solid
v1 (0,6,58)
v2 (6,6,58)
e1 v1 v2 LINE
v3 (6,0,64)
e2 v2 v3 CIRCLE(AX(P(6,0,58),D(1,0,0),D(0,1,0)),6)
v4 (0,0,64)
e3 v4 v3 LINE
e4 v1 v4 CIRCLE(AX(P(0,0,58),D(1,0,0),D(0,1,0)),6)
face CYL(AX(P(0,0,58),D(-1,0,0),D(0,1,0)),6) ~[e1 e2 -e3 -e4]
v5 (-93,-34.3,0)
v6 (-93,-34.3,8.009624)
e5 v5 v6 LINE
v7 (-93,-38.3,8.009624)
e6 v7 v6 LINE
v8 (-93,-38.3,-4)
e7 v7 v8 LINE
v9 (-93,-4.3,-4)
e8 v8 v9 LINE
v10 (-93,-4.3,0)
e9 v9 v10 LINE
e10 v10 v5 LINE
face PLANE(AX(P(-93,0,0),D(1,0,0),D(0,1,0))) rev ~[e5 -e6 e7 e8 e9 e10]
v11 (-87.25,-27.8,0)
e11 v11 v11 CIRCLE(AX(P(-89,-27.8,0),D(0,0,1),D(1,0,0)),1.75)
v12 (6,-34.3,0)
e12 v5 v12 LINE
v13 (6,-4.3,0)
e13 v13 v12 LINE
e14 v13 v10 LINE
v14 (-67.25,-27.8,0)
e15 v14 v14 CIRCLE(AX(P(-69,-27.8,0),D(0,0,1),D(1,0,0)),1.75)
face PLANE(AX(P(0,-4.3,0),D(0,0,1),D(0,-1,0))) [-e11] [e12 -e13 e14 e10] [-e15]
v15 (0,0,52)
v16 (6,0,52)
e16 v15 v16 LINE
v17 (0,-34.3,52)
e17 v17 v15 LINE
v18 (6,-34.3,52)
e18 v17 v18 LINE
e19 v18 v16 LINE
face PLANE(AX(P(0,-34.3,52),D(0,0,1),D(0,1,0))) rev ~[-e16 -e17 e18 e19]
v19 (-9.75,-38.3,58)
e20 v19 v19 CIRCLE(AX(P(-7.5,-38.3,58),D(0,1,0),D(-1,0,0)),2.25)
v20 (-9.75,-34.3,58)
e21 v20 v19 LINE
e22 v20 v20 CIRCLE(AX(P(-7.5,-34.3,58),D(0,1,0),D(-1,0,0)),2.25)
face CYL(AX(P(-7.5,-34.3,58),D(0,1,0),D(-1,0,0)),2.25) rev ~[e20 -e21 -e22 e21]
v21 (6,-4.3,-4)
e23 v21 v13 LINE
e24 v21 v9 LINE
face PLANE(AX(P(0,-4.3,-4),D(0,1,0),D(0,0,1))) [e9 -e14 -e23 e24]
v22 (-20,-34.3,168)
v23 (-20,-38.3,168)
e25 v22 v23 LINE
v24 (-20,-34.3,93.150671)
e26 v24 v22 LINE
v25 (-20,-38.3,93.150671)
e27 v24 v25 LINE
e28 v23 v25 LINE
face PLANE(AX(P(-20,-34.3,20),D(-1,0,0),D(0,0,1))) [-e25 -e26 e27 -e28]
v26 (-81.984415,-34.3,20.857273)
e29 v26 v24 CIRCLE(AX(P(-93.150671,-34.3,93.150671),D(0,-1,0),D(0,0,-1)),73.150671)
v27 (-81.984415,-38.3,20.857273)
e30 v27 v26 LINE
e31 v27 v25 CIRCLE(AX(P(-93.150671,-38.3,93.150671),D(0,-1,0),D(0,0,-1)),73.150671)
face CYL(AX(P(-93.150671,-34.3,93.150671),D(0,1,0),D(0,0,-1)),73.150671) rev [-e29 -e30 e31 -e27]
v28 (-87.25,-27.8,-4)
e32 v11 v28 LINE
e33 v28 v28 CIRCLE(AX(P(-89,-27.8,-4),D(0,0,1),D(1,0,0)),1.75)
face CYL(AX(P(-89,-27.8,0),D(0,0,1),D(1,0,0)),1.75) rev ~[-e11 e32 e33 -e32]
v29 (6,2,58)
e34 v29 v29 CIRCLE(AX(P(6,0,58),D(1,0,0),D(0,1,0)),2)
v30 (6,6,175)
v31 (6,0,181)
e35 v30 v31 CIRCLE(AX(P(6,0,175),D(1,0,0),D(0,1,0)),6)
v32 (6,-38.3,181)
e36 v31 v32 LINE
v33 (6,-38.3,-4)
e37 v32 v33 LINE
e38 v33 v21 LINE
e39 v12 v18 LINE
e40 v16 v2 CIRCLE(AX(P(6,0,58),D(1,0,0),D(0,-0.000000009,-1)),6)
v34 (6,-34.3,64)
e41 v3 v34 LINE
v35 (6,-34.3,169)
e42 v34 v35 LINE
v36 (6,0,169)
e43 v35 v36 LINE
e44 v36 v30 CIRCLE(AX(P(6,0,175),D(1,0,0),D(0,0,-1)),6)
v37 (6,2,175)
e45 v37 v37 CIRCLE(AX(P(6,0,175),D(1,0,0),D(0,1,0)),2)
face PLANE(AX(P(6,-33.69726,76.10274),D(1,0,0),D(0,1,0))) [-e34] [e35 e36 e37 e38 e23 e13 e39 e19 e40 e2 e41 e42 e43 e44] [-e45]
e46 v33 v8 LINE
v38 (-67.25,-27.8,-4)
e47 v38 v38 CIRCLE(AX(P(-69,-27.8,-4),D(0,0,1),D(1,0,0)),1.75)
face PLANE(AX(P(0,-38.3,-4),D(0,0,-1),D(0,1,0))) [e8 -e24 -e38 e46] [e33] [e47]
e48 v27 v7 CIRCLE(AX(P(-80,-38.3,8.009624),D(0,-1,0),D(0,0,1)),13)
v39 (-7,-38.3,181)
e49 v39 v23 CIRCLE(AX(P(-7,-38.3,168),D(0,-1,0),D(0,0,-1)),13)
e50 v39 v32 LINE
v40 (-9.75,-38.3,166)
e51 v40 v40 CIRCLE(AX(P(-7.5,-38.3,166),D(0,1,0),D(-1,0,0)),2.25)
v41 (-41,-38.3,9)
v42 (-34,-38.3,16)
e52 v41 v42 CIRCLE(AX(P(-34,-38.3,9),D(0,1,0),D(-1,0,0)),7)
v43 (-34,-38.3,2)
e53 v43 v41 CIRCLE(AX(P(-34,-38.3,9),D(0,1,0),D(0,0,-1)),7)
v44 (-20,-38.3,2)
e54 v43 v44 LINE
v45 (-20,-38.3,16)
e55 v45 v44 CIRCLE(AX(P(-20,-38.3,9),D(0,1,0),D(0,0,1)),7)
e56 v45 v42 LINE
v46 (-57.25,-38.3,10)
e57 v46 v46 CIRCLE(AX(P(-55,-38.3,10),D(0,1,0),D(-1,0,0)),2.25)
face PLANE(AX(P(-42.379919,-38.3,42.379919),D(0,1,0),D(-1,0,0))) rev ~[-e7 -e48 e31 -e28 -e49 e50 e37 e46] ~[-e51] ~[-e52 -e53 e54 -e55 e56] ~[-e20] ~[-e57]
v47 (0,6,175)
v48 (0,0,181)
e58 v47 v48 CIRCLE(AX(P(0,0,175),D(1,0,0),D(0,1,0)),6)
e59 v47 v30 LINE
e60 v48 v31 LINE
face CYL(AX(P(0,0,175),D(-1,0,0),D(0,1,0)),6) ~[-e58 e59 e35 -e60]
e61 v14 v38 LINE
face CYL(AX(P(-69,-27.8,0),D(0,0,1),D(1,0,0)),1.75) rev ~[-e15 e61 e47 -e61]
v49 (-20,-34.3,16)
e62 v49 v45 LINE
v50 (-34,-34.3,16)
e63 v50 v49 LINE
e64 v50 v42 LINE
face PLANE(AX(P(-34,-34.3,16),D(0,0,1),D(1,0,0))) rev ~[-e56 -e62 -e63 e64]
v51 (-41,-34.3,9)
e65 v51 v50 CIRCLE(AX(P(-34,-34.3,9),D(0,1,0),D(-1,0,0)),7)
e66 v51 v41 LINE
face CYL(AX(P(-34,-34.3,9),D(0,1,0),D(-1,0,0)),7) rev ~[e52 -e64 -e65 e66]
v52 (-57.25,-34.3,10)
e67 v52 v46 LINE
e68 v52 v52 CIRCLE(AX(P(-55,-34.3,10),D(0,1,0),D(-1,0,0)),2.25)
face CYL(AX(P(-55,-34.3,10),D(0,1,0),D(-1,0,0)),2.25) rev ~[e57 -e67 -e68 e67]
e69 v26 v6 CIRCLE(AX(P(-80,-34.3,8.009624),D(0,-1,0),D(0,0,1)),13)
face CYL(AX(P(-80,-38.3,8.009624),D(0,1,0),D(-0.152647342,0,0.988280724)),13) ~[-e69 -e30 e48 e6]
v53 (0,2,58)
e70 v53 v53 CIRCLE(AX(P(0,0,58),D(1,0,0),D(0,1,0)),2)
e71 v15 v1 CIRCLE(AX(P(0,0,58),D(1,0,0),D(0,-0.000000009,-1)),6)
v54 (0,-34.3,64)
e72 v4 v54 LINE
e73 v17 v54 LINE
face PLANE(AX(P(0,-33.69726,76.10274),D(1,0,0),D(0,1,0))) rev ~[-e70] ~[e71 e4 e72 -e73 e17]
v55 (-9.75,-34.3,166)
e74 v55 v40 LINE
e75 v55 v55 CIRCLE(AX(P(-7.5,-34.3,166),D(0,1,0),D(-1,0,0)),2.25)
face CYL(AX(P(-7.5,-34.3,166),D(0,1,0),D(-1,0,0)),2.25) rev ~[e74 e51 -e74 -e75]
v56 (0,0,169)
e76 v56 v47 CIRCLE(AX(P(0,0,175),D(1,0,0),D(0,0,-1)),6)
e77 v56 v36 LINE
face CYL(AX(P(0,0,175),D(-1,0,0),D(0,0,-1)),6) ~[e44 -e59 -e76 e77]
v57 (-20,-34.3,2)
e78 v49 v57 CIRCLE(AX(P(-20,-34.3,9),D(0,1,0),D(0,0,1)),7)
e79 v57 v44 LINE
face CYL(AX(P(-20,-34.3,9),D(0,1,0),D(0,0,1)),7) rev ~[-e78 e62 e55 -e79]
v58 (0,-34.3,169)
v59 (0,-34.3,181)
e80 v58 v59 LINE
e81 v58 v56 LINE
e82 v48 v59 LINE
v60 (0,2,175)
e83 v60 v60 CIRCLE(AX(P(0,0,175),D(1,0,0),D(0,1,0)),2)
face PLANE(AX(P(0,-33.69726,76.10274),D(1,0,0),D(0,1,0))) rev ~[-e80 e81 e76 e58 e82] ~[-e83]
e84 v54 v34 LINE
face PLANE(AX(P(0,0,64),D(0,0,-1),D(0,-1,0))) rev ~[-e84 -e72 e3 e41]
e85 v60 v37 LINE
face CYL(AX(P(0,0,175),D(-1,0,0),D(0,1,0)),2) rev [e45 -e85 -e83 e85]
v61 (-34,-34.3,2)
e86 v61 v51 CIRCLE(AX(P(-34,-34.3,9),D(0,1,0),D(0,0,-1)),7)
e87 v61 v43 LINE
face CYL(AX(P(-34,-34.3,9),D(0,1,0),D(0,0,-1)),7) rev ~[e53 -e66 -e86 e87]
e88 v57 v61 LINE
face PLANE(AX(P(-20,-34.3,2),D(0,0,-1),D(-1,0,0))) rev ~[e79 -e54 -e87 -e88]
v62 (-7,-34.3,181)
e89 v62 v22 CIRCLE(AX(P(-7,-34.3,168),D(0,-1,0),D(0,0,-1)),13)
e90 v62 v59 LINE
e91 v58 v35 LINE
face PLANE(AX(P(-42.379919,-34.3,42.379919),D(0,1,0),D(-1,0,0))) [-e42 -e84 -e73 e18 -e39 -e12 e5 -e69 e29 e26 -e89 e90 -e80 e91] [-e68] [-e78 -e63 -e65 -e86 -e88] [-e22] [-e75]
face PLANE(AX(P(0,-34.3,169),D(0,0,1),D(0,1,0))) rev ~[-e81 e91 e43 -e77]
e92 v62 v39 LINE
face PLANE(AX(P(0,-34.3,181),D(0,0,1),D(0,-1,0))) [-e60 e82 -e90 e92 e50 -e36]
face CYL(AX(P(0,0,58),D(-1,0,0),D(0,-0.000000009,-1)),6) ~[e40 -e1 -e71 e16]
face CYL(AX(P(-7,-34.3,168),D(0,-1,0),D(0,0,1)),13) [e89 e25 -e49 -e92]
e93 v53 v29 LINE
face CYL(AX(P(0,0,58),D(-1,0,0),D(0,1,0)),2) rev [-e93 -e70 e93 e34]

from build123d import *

# Parameters (mm, degrees)
F0_R        = 2
F1_DEPTH    = 6
F2_DEPTH    = 93
F4_DEPTH    = 25
F3_R        = 1.75
F5_DEPTH    = 4.001
F6_W        = 73
F6_H        = 161
F6_R        = 2.25
F7_DEPTH    = 4.001
F8_T4_DEPTH = 4
F9_R        = 13


# Not quite as in the source:
# - a fillet or chamfer that OpenCascade refuses, or shapes differently, is made with other operations: its cross-section is extruded or revolved along the edge and cut away or added


with BuildPart() as f1:
    # F0 (on Right) → F1 (new body)
    with BuildSketch(Plane.YZ):
        Polygon((-4.3, 0), (-34.3, 0), (-34.3, 52), (-34.3, 64), (-34.3, 169), (-34.3, 181), (-38.3, 181), (-38.3, -4), (-4.3, -4), align=None)
        with BuildLine():
            Line((-34.3, 181), (-34.3, 169))
            Line((-34.3, 169), (0, 169))
            ThreePointArc((0, 169), (-6, 174.9999999833), (-3.34e-08, 181))
            Line((-3.34e-08, 181), (-34.3, 181))
        make_face()
        with BuildLine():
            Line((-34.3, 64), (-34.3, 52))
            Line((-34.3, 52), (-5.41e-08, 52))
            ThreePointArc((-5.41e-08, 52), (-6, 58.0000000477), (4.13e-08, 64))
            Line((4.13e-08, 64), (-34.3, 64))
        make_face()
        with BuildLine():
            ThreePointArc((-3.34e-08, 181), (-6, 174.9999999833), (0, 169))
            ThreePointArc((0, 169), (4.2426406871, 170.7573593129), (6, 175))
            ThreePointArc((6, 175), (4.2426406753, 179.2426406989), (-3.34e-08, 181))
        make_face()
        with Locations((0, 175)):
            Circle(F0_R, mode=Mode.SUBTRACT)
        with BuildLine():
            ThreePointArc((4.13e-08, 64), (-6, 58.0000000477), (-5.41e-08, 52))
            ThreePointArc((-5.41e-08, 52), (4.242640668, 53.7573592937), (6, 58))
            ThreePointArc((6, 58), (4.2426407017, 62.2426406725), (4.13e-08, 64))
        make_face()
        with Locations((0, 58)):
            Circle(F0_R, mode=Mode.SUBTRACT)
    extrude(amount=F1_DEPTH)

    # F0 (on Right) → F2 (join)
    with BuildSketch(Plane.YZ):
        Polygon((-4.3, 0), (-34.3, 0), (-34.3, 52), (-34.3, 64), (-34.3, 169), (-34.3, 181), (-38.3, 181), (-38.3, -4), (-4.3, -4), align=None)
    extrude(amount=-F2_DEPTH)

    # F0 (on Right) → F4 (join)
    with BuildSketch(Plane.YZ):
        Polygon((-4.3, 0), (-34.3, 0), (-34.3, 52), (-34.3, 64), (-34.3, 169), (-34.3, 181), (-38.3, 181), (-38.3, -4), (-4.3, -4), align=None)
    extrude(amount=-F4_DEPTH)

    # F3 (on face) → F5 (cut, through all)
    with BuildSketch(Plane.XY):
        with Locations((-89, -27.8)):
            Circle(F3_R)
        with Locations((-69, -27.8)):
            Circle(F3_R)
    extrude(amount=-F5_DEPTH, mode=Mode.SUBTRACT)

    # F6 (on face) → F7 (cut, through all)
    with BuildSketch(Plane(origin=(0, -34.3, 0), x_dir=(-1, 0, 0), z_dir=(0, 1, 0))):
        with Locations((56.5, 100.5)):
            Rectangle(F6_W, F6_H)
        with BuildLine():
            ThreePointArc((20, 2), (24.9497474683, 4.0502525317), (27, 9))
            ThreePointArc((27, 9), (24.9497474683, 13.9497474683), (20, 16))
            ThreePointArc((20, 16), (13, 9), (20, 2))
        make_face()
        with BuildLine():
            ThreePointArc((34, 2), (29.0502525317, 4.0502525317), (27, 9))
            ThreePointArc((27, 9), (24.9497474683, 4.0502525317), (20, 2))
            Line((20, 2), (34, 2))
        make_face()
        with BuildLine():
            ThreePointArc((20, 16), (24.9497474683, 13.9497474683), (27, 9))
            ThreePointArc((27, 9), (29.0502525317, 13.9497474683), (34, 16))
            Line((34, 16), (20, 16))
        make_face()
        with BuildLine():
            ThreePointArc((34, 16), (29.0502525317, 13.9497474683), (27, 9))
            ThreePointArc((27, 9), (29.0502525317, 4.0502525317), (34, 2))
            ThreePointArc((34, 2), (38.9497474683, 4.0502525317), (41, 9))
            ThreePointArc((41, 9), (38.9497474683, 13.9497474683), (34, 16))
        make_face()
        with Locations((7.5, 166)):
            Circle(F6_R)
        with Locations((7.5, 58)):
            Circle(F6_R)
        with Locations((55, 10)):
            Circle(F6_R)
    extrude(amount=-F7_DEPTH, mode=Mode.SUBTRACT)

    # F8: fillet of radius 73.1506709399 on 1 edges, made by hand


with BuildPart() as f8_tool2:
    # F8_s3 → F8_t4 (new body)
    with BuildSketch(Plane.XZ.offset(34.3)):
        with BuildLine():
            ThreePointArc((-93.1506709399, 20), (-41.42533547, 41.42533547), (-20, 93.1506709399))
            Line((-20, 93.1506709399), (-20, 20))
            Line((-20, 20), (-93.1506709399, 20))
        make_face()
    extrude(amount=F8_T4_DEPTH)

    split(bisect_by=Plane.YZ.offset(-93), keep=Keep.TOP)


with BuildPart() as f1_1:
    add(f1.part)

    # F8_t1: union F8_tool2
    add(f8_tool2.part)

    # F9
    f9_edges = [f1_1.edges().sort_by_distance(p)[0] for p in [
        (-20, -36.3, 181),
        (-93, -36.3, 20.000155),
    ]]
    fillet(f9_edges, radius=F9_R)


solid = f1_1.part
